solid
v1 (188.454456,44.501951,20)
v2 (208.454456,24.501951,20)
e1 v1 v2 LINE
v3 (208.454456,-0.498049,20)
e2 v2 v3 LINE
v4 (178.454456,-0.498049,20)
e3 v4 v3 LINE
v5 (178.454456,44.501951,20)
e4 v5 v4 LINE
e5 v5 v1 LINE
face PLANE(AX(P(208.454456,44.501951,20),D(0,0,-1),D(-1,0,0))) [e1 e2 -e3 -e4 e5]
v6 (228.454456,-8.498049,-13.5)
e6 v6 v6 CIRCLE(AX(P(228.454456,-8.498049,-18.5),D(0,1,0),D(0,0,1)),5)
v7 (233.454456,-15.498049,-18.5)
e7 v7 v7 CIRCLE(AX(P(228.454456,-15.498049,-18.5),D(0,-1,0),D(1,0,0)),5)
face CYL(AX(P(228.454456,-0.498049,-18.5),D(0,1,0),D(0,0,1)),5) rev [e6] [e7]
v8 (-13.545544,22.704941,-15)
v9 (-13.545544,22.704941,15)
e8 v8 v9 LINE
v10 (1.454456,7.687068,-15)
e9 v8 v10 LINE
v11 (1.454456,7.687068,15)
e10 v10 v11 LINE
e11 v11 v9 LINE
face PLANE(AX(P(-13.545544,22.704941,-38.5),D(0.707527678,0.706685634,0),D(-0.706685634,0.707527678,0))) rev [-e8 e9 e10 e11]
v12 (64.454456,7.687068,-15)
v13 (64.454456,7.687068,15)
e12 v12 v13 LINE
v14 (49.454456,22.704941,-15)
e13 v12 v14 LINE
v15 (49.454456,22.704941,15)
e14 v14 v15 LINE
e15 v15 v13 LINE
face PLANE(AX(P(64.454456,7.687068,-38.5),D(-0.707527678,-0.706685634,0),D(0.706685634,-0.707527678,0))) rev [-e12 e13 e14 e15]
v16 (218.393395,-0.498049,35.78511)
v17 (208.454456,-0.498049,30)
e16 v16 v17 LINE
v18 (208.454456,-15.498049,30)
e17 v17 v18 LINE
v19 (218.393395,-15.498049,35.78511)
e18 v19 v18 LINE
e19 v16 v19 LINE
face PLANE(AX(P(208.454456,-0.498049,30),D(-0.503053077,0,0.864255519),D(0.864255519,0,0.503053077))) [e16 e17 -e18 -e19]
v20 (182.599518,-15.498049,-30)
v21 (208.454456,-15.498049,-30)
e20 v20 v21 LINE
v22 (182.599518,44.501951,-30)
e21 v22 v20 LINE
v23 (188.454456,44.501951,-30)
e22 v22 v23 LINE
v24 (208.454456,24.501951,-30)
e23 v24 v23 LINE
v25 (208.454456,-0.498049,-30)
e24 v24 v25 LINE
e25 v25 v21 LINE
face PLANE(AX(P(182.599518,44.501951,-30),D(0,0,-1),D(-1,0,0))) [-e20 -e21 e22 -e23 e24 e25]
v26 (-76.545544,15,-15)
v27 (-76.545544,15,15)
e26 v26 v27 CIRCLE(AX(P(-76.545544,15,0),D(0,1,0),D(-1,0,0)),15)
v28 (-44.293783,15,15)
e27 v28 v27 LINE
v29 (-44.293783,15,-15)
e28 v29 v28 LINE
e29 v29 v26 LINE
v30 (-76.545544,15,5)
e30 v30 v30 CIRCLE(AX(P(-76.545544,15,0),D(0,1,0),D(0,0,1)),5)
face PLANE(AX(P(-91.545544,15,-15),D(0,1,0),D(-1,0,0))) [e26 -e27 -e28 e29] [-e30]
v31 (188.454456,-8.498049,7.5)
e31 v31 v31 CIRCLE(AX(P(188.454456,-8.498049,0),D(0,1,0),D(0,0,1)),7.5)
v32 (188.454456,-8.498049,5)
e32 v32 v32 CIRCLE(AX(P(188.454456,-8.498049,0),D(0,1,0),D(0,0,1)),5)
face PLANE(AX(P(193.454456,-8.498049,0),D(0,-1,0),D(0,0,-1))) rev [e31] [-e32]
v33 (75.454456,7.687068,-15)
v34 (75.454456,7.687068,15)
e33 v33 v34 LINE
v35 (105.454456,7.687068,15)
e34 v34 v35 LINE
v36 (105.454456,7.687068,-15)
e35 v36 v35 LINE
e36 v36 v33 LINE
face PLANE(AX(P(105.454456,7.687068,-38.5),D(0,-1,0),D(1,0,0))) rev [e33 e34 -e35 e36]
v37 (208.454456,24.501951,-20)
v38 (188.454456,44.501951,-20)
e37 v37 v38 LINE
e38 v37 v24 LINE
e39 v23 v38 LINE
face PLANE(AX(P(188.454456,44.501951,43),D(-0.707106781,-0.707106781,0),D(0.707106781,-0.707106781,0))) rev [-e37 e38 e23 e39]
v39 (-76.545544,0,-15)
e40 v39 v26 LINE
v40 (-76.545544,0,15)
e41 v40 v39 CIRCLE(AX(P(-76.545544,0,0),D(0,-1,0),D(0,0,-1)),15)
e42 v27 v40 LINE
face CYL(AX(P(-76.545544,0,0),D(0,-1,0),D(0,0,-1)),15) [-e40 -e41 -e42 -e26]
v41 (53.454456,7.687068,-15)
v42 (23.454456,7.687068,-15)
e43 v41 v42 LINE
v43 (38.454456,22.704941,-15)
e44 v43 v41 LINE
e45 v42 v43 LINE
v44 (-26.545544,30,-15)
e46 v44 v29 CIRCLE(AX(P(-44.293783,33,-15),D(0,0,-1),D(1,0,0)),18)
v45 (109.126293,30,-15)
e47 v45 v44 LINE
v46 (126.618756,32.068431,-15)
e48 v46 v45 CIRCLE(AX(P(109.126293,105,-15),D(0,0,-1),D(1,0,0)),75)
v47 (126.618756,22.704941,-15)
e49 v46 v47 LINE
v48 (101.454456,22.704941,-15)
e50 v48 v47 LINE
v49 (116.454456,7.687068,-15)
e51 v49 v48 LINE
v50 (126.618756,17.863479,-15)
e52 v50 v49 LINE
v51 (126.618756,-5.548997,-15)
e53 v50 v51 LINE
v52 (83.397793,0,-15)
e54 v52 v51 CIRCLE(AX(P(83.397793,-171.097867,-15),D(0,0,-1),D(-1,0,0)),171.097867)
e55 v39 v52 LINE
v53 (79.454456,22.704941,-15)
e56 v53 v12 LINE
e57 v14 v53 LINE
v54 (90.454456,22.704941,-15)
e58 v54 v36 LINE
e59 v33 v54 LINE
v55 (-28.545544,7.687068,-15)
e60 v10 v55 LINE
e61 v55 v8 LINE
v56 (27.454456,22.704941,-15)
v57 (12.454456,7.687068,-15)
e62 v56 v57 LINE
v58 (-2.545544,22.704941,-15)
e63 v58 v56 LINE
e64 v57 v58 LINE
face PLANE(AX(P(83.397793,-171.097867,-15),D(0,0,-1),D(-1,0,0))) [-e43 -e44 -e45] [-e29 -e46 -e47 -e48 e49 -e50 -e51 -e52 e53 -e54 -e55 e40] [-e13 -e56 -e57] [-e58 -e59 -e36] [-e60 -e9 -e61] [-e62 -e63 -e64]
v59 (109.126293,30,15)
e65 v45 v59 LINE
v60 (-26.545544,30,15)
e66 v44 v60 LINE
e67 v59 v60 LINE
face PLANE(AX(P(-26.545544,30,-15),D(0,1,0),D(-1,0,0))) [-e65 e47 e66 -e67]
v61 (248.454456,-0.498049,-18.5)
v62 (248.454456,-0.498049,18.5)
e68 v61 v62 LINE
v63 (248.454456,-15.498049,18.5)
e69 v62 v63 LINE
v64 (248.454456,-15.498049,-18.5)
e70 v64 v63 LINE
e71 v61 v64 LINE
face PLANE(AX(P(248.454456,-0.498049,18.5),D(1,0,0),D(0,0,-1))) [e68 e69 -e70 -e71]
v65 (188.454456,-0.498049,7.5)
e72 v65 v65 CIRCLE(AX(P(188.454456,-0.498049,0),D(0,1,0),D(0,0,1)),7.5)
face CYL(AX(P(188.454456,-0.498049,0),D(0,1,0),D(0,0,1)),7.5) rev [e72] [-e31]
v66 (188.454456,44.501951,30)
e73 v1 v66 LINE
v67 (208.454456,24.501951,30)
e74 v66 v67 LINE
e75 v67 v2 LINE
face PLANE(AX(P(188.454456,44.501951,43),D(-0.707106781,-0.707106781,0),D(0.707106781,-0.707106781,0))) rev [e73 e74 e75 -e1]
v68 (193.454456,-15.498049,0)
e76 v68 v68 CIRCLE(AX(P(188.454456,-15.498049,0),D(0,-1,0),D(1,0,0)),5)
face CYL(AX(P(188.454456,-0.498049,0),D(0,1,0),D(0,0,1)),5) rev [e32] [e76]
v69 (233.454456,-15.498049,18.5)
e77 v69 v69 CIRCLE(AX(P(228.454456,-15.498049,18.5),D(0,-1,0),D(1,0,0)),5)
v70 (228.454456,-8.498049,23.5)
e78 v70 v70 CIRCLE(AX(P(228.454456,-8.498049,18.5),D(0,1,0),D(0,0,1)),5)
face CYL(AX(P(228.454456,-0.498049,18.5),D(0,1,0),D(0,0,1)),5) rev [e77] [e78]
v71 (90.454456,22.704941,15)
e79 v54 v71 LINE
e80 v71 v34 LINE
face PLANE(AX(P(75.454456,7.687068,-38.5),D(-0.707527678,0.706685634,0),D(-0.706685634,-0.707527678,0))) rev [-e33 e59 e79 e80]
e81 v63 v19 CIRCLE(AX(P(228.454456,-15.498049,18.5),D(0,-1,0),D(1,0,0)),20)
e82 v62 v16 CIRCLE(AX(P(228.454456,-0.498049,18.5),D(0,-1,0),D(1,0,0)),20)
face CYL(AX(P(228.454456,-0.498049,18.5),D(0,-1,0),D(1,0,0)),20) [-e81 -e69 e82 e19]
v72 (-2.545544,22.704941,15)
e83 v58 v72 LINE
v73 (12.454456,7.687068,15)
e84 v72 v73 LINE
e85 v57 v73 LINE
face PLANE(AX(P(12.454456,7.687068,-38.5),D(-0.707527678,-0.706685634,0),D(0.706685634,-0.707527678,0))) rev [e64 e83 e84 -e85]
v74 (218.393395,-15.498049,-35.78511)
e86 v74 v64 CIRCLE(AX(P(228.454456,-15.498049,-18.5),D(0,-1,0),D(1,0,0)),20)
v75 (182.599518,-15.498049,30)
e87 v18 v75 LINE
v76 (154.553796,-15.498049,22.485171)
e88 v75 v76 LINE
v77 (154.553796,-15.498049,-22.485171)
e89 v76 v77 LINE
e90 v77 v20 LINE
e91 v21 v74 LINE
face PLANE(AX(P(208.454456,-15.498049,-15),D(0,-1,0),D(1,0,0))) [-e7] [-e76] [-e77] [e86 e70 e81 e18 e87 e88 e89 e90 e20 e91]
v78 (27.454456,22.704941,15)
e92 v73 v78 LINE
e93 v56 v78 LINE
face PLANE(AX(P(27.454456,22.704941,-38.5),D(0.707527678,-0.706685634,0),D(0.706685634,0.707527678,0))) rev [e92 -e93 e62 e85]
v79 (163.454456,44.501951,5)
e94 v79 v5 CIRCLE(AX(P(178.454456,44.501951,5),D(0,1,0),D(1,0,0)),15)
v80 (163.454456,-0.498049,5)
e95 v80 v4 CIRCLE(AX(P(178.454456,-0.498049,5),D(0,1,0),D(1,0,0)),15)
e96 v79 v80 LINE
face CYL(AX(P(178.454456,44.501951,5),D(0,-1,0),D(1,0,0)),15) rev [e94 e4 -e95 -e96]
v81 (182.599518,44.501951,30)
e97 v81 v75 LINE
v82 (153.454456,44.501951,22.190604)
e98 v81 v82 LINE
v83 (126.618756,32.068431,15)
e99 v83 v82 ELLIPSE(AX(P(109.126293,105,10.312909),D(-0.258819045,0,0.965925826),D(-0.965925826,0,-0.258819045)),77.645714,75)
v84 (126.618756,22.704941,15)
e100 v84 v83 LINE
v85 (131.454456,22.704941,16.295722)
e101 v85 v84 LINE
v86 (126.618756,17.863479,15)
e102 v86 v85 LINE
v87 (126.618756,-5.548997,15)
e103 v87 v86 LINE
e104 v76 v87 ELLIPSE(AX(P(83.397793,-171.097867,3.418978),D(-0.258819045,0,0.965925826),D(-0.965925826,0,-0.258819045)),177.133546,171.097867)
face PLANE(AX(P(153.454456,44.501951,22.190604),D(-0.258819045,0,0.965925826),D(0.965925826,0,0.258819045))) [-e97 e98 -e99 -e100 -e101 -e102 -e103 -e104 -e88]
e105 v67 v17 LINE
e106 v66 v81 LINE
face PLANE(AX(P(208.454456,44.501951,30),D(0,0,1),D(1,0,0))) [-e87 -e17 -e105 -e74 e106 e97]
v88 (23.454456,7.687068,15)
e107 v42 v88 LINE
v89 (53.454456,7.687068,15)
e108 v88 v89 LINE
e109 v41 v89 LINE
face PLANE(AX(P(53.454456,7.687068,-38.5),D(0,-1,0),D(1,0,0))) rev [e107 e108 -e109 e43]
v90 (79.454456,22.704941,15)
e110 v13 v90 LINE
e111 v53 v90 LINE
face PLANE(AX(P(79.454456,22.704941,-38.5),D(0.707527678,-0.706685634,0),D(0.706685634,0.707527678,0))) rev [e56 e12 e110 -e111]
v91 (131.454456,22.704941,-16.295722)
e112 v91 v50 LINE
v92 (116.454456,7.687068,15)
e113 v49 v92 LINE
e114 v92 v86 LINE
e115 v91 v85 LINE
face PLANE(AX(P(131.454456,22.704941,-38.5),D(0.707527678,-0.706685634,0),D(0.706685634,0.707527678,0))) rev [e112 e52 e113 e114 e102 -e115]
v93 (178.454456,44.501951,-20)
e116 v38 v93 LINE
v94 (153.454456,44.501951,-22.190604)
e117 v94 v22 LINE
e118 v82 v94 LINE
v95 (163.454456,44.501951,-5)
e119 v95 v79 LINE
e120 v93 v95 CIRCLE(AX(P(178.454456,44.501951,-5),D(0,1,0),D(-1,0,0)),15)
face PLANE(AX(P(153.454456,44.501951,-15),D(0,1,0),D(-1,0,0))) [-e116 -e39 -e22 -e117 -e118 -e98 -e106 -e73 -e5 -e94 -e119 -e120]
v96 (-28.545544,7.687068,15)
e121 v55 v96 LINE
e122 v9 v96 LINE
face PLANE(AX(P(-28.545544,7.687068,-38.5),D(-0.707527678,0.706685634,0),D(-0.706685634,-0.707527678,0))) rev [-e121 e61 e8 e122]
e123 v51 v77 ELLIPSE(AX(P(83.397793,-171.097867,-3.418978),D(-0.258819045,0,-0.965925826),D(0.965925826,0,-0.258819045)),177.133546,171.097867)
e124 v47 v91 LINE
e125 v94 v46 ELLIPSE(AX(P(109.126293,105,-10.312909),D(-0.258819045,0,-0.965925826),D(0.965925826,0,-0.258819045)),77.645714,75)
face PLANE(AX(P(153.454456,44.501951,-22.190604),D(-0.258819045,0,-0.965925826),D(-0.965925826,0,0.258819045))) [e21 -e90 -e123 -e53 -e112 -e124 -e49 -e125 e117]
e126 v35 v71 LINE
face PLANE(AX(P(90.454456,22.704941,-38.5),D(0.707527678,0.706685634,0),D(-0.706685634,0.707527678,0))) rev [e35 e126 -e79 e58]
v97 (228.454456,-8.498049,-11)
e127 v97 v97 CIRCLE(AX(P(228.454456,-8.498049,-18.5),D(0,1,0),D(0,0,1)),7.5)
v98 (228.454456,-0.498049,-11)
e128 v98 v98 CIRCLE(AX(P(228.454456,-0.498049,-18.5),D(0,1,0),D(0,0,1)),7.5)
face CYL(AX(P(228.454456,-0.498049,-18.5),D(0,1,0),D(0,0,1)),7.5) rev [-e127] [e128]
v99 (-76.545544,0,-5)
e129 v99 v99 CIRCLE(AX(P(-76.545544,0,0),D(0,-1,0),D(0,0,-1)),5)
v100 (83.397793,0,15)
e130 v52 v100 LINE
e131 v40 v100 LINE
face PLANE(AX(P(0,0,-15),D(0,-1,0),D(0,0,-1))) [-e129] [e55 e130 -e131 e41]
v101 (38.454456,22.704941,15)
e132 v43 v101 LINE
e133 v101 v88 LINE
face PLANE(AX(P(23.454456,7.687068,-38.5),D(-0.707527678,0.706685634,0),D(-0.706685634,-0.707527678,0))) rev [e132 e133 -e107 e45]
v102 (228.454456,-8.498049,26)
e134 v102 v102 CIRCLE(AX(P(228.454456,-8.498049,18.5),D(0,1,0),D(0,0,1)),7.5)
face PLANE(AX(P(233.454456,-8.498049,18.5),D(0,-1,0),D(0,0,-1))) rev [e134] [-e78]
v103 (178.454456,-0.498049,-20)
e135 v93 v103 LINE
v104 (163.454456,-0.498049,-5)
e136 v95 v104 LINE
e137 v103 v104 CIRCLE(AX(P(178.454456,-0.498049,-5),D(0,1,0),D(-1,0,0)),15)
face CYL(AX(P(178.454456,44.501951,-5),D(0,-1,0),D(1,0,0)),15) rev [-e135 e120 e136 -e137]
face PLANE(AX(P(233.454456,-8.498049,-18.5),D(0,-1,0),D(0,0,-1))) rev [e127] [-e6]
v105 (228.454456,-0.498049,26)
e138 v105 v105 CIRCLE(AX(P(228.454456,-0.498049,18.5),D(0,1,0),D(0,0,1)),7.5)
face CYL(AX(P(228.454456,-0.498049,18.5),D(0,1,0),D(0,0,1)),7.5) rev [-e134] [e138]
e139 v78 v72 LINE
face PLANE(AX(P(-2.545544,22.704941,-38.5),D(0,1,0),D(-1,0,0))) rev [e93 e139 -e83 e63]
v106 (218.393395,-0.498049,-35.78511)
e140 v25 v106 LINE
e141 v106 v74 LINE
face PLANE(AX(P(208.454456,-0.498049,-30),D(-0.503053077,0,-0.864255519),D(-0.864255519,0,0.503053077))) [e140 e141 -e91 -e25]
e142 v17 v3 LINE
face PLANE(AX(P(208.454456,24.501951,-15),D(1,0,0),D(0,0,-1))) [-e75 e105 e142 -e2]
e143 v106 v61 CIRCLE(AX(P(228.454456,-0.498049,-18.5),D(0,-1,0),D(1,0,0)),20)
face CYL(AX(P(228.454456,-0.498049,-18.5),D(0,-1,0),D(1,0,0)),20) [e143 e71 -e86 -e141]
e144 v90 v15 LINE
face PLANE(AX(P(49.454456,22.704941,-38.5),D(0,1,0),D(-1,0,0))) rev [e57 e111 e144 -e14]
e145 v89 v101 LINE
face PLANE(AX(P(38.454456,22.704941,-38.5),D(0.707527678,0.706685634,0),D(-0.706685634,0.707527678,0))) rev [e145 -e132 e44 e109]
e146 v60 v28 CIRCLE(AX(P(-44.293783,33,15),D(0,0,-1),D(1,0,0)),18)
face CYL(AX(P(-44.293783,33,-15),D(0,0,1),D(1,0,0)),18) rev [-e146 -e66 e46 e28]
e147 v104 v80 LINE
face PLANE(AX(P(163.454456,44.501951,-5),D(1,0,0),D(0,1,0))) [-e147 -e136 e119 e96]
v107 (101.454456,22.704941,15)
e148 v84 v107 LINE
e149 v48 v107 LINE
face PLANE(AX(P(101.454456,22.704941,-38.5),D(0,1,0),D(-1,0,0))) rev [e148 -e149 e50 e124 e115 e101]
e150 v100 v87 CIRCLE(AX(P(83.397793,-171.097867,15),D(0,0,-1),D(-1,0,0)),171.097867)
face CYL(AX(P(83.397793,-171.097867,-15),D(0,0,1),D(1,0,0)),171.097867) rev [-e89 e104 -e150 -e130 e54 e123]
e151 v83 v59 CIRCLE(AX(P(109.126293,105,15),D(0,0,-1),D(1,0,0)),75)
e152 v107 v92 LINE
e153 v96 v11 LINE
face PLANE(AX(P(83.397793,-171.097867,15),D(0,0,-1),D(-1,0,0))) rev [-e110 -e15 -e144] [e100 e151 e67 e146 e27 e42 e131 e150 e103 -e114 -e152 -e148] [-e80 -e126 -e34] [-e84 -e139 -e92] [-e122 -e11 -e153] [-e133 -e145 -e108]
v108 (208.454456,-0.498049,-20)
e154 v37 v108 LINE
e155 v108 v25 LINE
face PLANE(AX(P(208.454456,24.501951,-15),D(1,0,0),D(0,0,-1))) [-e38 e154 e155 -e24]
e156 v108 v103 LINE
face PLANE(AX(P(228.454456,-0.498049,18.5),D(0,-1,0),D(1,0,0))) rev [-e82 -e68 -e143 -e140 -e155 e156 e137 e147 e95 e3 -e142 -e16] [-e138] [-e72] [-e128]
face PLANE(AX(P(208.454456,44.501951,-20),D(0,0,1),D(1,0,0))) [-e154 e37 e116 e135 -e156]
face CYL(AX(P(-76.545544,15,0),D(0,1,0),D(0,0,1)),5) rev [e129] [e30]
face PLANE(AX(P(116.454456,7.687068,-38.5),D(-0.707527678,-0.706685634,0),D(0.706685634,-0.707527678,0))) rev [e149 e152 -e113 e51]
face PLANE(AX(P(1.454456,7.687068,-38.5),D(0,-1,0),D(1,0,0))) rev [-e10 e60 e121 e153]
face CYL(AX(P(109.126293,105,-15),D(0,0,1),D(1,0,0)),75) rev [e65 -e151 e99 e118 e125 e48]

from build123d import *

# Parameters (mm, degrees)
BOSS_EXTRUDE1_DEPTH                     = 15
BOSS_EXTRUDE1_DEPTH_BACK                = 15
FILLET1_R                               = 15
BOSS_EXTRUDE2_DEPTH                     = 60
CUT_EXTRUDE5_DEPTH                      = 43
CUT_EXTRUDE5_DEPTH_BACK                 = 43
SKETCH1_6_OUTSIDE_W                     = 364.354
SKETCH1_6_OUTSIDE_H                     = 124.354
BOSS_EXTRUDE3_DEPTH                     = 15
CUT_EXTRUDE7_DEPTH                      = 256.415087263
CBORE_FOR_M5_HEX_HEAD_BOLT1_D           = 10
CBORE_FOR_M5_HEX_HEAD_BOLT1_DEPTH       = 20
CBORE_FOR_M5_HEX_HEAD_BOLT1_CBORE_D     = 15
CBORE_FOR_M5_HEX_HEAD_BOLT1_CBORE_DEPTH = 8
CBORE_FOR_M5_HEX_HEAD_BOLT1_TIP         = 3.004303095
F_10_0MM_DOWEL_HOLE1_D                  = 10
CUT_EXTRUDE9_DEPTH                      = 259.016066246
CUT_EXTRUDE14_DEPTH                     = 259.016066246


with BuildPart() as part:
    # Sketch1 → Boss-Extrude1 (new, two sides: drawn at the far end of the back side and taken through both)
    with BuildSketch(Plane.XY.offset(-BOSS_EXTRUDE1_DEPTH_BACK)):
        with BuildLine():
            Line((0, 0), (-91.545543809, 0))
            Line((-91.545543809, 0), (-91.545543809, 15))
            Line((-91.545543809, 15), (-44.293783158, 15))
            ThreePointArc((-44.293783158, 15), (-32.674833119, 19.252272915), (-26.545543809, 30))
            Line((-26.545543809, 30), (109.126292876, 30))
            ThreePointArc((109.126292876, 30), (132.446309196, 33.71762603), (153.454456191, 44.501950965))
            Line((153.454456191, 44.501950965), (188.454456191, 44.501950965))
            Line((188.454456191, 44.501950965), (208.454456191, 24.501950965))
            Line((208.454456191, 24.501950965), (208.454456191, 0))
            Line((208.454456191, 0), (208.454456191, -15.498049035))
            Line((208.454456191, -15.498049035), (154.553796185, -15.498049035))
            ThreePointArc((154.553796185, -15.498049035), (119.809900794, -3.919403897), (83.397793421, 0))
            Line((83.397793421, 0), (0, 0))
        make_face()
    extrude(amount=BOSS_EXTRUDE1_DEPTH + BOSS_EXTRUDE1_DEPTH_BACK)

    # Fillet1
    fillet1_edges = [part.edges().sort_by_distance(p)[0] for p in [
        (-91.545543809, 7.5, 15),
        (-91.545543809, 7.5, -15),
    ]]
    fillet(fillet1_edges, radius=FILLET1_R - 0.0001)  # a hair under: the kernel refuses the full size

    # Sketch2 → Boss-Extrude2 (add)
    with BuildSketch(Plane.XZ.offset(15.498049035)):
        Polygon((126.618755864, -15), (153.454456191, -22.190604231), (182.599517977, -30), (208.454456191, -30), (208.454456191, 30), (182.599517977, 30), (153.454456191, 22.190604231), (126.618755864, 15), align=None)
    extrude(amount=-BOSS_EXTRUDE2_DEPTH)

    # Sketch1<6> outside → Cut-Extrude5 (cut, two sides: drawn at the far end of the back side and taken through both)
    with BuildSketch(Plane.XY.offset(-CUT_EXTRUDE5_DEPTH_BACK)):
        with Locations((58.454, 14.502)):
            Rectangle(SKETCH1_6_OUTSIDE_W, SKETCH1_6_OUTSIDE_H)
        with BuildLine():
            Line((0, 0), (-91.545543809, 0))
            Line((-91.545543809, 0), (-91.545543809, 15))
            Line((-91.545543809, 15), (-44.293783158, 15))
            ThreePointArc((-44.293783158, 15), (-32.674833119, 19.252272915), (-26.545543809, 30))
            Line((-26.545543809, 30), (109.126292876, 30))
            ThreePointArc((109.126292876, 30), (132.446309196, 33.71762603), (153.454456191, 44.501950965))
            Line((153.454456191, 44.501950965), (188.454456191, 44.501950965))
            Line((188.454456191, 44.501950965), (208.454456191, 24.501950965))
            Line((208.454456191, 24.501950965), (208.454456191, 0))
            Line((208.454456191, 0), (208.454456191, -15.498049035))
            Line((208.454456191, -15.498049035), (154.553796185, -15.498049035))
            ThreePointArc((154.553796185, -15.498049035), (119.809900794, -3.919403897), (83.397793421, 0))
            Line((83.397793421, 0), (0, 0))
        make_face(mode=Mode.SUBTRACT)
    extrude(amount=CUT_EXTRUDE5_DEPTH + CUT_EXTRUDE5_DEPTH_BACK, mode=Mode.SUBTRACT)

    # Sketch3 → Boss-Extrude3 (add)
    with BuildSketch(Plane.XZ.offset(15.498049035)):
        with BuildLine():
            Line((208.454456191, -30), (218.39339466, -35.78511038))
            ThreePointArc((218.39339466, -35.78511038), (238.423878677, -35.838126061), (248.454456191, -18.5))
            Line((248.454456191, -18.5), (248.454456191, 18.5))
            ThreePointArc((248.454456191, 18.5), (238.423878677, 35.838126061), (218.39339466, 35.78511038))
            Line((218.39339466, 35.78511038), (208.454456191, 30))
            Line((208.454456191, 30), (208.454456191, -30))
        make_face()
    extrude(amount=-BOSS_EXTRUDE3_DEPTH)

    # Sketch4 → Cut-Extrude7 (cut, through all)
    with BuildSketch(Plane(origin=(0, -0.498049035, 0), x_dir=(1, 0, 0), z_dir=(0, 1, 0))):
        with BuildLine():
            Line((208.454456191, 20), (178.454456191, 20))
            ThreePointArc((178.454456191, 20), (167.847854474, 15.606601718), (163.454456191, 5))
            Line((163.454456191, 5), (163.454456191, -5))
            ThreePointArc((163.454456191, -5), (167.847854474, -15.606601718), (178.454456191, -20))
            Line((178.454456191, -20), (208.454456191, -20))
            Line((208.454456191, -20), (208.454456191, 20))
        make_face()
    extrude(amount=CUT_EXTRUDE7_DEPTH, mode=Mode.SUBTRACT)

    # CBORE for M5 Hex Head Bolt1
    with Locations(Plane(origin=(0, -0.498049035, 0), x_dir=(1, 0, 0), z_dir=(0, 1, 0))):
        with Locations((188.454456191, 0), (228.454456191, 18.5), (228.454456191, -18.5)):
            CounterBoreHole(CBORE_FOR_M5_HEX_HEAD_BOLT1_D / 2, CBORE_FOR_M5_HEX_HEAD_BOLT1_CBORE_D / 2, CBORE_FOR_M5_HEX_HEAD_BOLT1_CBORE_DEPTH, depth=CBORE_FOR_M5_HEX_HEAD_BOLT1_DEPTH)
            with Locations((0, 0, -(CBORE_FOR_M5_HEX_HEAD_BOLT1_DEPTH + CBORE_FOR_M5_HEX_HEAD_BOLT1_TIP / 2))):  # 118° drill point
                Cone(0, CBORE_FOR_M5_HEX_HEAD_BOLT1_D / 2, CBORE_FOR_M5_HEX_HEAD_BOLT1_TIP, mode=Mode.SUBTRACT)

    # Ø10.0mm Dowel Hole1 (through all)
    with Locations(Plane(origin=(0, 15, 0), x_dir=(1, 0, 0), z_dir=(0, 1, 0))):
        with Locations((-76.545543809, 0)):
            Hole(F_10_0MM_DOWEL_HOLE1_D / 2)

    # Sketch14 → Cut-Extrude9 (cut, through all)
    with BuildSketch(Plane.XY.offset(15)):
        Polygon((-28.545543809, 7.687067678), (-13.545543809, 22.704940786), (1.454456191, 7.687067678), align=None)
        Polygon((12.454456191, 7.687067678), (-2.545543809, 22.704940786), (27.454456191, 22.704940786), align=None)
        Polygon((49.454456191, 22.704940786), (79.454456191, 22.704940786), (64.454456191, 7.687067678), align=None)
        Polygon((23.454456191, 7.687067678), (38.454456191, 22.704940786), (53.454456191, 7.687067678), align=None)
        Polygon((75.454456191, 7.687067678), (90.454456191, 22.704940786), (105.454456191, 7.687067678), align=None)
        Polygon((116.454456191, 7.687067678), (101.454456191, 22.704940786), (131.454456191, 22.704940786), align=None)
    extrude(amount=-CUT_EXTRUDE9_DEPTH, mode=Mode.SUBTRACT)

    # Sketch14<3> → Cut-Extrude14 (cut, through all)
    with BuildSketch(Plane.XY.offset(15)):
        Polygon((116.454456191, 7.687067678), (101.454456191, 22.704940786), (131.454456191, 22.704940786), align=None)
    extrude(amount=CUT_EXTRUDE14_DEPTH, mode=Mode.SUBTRACT)


solid = part.part
